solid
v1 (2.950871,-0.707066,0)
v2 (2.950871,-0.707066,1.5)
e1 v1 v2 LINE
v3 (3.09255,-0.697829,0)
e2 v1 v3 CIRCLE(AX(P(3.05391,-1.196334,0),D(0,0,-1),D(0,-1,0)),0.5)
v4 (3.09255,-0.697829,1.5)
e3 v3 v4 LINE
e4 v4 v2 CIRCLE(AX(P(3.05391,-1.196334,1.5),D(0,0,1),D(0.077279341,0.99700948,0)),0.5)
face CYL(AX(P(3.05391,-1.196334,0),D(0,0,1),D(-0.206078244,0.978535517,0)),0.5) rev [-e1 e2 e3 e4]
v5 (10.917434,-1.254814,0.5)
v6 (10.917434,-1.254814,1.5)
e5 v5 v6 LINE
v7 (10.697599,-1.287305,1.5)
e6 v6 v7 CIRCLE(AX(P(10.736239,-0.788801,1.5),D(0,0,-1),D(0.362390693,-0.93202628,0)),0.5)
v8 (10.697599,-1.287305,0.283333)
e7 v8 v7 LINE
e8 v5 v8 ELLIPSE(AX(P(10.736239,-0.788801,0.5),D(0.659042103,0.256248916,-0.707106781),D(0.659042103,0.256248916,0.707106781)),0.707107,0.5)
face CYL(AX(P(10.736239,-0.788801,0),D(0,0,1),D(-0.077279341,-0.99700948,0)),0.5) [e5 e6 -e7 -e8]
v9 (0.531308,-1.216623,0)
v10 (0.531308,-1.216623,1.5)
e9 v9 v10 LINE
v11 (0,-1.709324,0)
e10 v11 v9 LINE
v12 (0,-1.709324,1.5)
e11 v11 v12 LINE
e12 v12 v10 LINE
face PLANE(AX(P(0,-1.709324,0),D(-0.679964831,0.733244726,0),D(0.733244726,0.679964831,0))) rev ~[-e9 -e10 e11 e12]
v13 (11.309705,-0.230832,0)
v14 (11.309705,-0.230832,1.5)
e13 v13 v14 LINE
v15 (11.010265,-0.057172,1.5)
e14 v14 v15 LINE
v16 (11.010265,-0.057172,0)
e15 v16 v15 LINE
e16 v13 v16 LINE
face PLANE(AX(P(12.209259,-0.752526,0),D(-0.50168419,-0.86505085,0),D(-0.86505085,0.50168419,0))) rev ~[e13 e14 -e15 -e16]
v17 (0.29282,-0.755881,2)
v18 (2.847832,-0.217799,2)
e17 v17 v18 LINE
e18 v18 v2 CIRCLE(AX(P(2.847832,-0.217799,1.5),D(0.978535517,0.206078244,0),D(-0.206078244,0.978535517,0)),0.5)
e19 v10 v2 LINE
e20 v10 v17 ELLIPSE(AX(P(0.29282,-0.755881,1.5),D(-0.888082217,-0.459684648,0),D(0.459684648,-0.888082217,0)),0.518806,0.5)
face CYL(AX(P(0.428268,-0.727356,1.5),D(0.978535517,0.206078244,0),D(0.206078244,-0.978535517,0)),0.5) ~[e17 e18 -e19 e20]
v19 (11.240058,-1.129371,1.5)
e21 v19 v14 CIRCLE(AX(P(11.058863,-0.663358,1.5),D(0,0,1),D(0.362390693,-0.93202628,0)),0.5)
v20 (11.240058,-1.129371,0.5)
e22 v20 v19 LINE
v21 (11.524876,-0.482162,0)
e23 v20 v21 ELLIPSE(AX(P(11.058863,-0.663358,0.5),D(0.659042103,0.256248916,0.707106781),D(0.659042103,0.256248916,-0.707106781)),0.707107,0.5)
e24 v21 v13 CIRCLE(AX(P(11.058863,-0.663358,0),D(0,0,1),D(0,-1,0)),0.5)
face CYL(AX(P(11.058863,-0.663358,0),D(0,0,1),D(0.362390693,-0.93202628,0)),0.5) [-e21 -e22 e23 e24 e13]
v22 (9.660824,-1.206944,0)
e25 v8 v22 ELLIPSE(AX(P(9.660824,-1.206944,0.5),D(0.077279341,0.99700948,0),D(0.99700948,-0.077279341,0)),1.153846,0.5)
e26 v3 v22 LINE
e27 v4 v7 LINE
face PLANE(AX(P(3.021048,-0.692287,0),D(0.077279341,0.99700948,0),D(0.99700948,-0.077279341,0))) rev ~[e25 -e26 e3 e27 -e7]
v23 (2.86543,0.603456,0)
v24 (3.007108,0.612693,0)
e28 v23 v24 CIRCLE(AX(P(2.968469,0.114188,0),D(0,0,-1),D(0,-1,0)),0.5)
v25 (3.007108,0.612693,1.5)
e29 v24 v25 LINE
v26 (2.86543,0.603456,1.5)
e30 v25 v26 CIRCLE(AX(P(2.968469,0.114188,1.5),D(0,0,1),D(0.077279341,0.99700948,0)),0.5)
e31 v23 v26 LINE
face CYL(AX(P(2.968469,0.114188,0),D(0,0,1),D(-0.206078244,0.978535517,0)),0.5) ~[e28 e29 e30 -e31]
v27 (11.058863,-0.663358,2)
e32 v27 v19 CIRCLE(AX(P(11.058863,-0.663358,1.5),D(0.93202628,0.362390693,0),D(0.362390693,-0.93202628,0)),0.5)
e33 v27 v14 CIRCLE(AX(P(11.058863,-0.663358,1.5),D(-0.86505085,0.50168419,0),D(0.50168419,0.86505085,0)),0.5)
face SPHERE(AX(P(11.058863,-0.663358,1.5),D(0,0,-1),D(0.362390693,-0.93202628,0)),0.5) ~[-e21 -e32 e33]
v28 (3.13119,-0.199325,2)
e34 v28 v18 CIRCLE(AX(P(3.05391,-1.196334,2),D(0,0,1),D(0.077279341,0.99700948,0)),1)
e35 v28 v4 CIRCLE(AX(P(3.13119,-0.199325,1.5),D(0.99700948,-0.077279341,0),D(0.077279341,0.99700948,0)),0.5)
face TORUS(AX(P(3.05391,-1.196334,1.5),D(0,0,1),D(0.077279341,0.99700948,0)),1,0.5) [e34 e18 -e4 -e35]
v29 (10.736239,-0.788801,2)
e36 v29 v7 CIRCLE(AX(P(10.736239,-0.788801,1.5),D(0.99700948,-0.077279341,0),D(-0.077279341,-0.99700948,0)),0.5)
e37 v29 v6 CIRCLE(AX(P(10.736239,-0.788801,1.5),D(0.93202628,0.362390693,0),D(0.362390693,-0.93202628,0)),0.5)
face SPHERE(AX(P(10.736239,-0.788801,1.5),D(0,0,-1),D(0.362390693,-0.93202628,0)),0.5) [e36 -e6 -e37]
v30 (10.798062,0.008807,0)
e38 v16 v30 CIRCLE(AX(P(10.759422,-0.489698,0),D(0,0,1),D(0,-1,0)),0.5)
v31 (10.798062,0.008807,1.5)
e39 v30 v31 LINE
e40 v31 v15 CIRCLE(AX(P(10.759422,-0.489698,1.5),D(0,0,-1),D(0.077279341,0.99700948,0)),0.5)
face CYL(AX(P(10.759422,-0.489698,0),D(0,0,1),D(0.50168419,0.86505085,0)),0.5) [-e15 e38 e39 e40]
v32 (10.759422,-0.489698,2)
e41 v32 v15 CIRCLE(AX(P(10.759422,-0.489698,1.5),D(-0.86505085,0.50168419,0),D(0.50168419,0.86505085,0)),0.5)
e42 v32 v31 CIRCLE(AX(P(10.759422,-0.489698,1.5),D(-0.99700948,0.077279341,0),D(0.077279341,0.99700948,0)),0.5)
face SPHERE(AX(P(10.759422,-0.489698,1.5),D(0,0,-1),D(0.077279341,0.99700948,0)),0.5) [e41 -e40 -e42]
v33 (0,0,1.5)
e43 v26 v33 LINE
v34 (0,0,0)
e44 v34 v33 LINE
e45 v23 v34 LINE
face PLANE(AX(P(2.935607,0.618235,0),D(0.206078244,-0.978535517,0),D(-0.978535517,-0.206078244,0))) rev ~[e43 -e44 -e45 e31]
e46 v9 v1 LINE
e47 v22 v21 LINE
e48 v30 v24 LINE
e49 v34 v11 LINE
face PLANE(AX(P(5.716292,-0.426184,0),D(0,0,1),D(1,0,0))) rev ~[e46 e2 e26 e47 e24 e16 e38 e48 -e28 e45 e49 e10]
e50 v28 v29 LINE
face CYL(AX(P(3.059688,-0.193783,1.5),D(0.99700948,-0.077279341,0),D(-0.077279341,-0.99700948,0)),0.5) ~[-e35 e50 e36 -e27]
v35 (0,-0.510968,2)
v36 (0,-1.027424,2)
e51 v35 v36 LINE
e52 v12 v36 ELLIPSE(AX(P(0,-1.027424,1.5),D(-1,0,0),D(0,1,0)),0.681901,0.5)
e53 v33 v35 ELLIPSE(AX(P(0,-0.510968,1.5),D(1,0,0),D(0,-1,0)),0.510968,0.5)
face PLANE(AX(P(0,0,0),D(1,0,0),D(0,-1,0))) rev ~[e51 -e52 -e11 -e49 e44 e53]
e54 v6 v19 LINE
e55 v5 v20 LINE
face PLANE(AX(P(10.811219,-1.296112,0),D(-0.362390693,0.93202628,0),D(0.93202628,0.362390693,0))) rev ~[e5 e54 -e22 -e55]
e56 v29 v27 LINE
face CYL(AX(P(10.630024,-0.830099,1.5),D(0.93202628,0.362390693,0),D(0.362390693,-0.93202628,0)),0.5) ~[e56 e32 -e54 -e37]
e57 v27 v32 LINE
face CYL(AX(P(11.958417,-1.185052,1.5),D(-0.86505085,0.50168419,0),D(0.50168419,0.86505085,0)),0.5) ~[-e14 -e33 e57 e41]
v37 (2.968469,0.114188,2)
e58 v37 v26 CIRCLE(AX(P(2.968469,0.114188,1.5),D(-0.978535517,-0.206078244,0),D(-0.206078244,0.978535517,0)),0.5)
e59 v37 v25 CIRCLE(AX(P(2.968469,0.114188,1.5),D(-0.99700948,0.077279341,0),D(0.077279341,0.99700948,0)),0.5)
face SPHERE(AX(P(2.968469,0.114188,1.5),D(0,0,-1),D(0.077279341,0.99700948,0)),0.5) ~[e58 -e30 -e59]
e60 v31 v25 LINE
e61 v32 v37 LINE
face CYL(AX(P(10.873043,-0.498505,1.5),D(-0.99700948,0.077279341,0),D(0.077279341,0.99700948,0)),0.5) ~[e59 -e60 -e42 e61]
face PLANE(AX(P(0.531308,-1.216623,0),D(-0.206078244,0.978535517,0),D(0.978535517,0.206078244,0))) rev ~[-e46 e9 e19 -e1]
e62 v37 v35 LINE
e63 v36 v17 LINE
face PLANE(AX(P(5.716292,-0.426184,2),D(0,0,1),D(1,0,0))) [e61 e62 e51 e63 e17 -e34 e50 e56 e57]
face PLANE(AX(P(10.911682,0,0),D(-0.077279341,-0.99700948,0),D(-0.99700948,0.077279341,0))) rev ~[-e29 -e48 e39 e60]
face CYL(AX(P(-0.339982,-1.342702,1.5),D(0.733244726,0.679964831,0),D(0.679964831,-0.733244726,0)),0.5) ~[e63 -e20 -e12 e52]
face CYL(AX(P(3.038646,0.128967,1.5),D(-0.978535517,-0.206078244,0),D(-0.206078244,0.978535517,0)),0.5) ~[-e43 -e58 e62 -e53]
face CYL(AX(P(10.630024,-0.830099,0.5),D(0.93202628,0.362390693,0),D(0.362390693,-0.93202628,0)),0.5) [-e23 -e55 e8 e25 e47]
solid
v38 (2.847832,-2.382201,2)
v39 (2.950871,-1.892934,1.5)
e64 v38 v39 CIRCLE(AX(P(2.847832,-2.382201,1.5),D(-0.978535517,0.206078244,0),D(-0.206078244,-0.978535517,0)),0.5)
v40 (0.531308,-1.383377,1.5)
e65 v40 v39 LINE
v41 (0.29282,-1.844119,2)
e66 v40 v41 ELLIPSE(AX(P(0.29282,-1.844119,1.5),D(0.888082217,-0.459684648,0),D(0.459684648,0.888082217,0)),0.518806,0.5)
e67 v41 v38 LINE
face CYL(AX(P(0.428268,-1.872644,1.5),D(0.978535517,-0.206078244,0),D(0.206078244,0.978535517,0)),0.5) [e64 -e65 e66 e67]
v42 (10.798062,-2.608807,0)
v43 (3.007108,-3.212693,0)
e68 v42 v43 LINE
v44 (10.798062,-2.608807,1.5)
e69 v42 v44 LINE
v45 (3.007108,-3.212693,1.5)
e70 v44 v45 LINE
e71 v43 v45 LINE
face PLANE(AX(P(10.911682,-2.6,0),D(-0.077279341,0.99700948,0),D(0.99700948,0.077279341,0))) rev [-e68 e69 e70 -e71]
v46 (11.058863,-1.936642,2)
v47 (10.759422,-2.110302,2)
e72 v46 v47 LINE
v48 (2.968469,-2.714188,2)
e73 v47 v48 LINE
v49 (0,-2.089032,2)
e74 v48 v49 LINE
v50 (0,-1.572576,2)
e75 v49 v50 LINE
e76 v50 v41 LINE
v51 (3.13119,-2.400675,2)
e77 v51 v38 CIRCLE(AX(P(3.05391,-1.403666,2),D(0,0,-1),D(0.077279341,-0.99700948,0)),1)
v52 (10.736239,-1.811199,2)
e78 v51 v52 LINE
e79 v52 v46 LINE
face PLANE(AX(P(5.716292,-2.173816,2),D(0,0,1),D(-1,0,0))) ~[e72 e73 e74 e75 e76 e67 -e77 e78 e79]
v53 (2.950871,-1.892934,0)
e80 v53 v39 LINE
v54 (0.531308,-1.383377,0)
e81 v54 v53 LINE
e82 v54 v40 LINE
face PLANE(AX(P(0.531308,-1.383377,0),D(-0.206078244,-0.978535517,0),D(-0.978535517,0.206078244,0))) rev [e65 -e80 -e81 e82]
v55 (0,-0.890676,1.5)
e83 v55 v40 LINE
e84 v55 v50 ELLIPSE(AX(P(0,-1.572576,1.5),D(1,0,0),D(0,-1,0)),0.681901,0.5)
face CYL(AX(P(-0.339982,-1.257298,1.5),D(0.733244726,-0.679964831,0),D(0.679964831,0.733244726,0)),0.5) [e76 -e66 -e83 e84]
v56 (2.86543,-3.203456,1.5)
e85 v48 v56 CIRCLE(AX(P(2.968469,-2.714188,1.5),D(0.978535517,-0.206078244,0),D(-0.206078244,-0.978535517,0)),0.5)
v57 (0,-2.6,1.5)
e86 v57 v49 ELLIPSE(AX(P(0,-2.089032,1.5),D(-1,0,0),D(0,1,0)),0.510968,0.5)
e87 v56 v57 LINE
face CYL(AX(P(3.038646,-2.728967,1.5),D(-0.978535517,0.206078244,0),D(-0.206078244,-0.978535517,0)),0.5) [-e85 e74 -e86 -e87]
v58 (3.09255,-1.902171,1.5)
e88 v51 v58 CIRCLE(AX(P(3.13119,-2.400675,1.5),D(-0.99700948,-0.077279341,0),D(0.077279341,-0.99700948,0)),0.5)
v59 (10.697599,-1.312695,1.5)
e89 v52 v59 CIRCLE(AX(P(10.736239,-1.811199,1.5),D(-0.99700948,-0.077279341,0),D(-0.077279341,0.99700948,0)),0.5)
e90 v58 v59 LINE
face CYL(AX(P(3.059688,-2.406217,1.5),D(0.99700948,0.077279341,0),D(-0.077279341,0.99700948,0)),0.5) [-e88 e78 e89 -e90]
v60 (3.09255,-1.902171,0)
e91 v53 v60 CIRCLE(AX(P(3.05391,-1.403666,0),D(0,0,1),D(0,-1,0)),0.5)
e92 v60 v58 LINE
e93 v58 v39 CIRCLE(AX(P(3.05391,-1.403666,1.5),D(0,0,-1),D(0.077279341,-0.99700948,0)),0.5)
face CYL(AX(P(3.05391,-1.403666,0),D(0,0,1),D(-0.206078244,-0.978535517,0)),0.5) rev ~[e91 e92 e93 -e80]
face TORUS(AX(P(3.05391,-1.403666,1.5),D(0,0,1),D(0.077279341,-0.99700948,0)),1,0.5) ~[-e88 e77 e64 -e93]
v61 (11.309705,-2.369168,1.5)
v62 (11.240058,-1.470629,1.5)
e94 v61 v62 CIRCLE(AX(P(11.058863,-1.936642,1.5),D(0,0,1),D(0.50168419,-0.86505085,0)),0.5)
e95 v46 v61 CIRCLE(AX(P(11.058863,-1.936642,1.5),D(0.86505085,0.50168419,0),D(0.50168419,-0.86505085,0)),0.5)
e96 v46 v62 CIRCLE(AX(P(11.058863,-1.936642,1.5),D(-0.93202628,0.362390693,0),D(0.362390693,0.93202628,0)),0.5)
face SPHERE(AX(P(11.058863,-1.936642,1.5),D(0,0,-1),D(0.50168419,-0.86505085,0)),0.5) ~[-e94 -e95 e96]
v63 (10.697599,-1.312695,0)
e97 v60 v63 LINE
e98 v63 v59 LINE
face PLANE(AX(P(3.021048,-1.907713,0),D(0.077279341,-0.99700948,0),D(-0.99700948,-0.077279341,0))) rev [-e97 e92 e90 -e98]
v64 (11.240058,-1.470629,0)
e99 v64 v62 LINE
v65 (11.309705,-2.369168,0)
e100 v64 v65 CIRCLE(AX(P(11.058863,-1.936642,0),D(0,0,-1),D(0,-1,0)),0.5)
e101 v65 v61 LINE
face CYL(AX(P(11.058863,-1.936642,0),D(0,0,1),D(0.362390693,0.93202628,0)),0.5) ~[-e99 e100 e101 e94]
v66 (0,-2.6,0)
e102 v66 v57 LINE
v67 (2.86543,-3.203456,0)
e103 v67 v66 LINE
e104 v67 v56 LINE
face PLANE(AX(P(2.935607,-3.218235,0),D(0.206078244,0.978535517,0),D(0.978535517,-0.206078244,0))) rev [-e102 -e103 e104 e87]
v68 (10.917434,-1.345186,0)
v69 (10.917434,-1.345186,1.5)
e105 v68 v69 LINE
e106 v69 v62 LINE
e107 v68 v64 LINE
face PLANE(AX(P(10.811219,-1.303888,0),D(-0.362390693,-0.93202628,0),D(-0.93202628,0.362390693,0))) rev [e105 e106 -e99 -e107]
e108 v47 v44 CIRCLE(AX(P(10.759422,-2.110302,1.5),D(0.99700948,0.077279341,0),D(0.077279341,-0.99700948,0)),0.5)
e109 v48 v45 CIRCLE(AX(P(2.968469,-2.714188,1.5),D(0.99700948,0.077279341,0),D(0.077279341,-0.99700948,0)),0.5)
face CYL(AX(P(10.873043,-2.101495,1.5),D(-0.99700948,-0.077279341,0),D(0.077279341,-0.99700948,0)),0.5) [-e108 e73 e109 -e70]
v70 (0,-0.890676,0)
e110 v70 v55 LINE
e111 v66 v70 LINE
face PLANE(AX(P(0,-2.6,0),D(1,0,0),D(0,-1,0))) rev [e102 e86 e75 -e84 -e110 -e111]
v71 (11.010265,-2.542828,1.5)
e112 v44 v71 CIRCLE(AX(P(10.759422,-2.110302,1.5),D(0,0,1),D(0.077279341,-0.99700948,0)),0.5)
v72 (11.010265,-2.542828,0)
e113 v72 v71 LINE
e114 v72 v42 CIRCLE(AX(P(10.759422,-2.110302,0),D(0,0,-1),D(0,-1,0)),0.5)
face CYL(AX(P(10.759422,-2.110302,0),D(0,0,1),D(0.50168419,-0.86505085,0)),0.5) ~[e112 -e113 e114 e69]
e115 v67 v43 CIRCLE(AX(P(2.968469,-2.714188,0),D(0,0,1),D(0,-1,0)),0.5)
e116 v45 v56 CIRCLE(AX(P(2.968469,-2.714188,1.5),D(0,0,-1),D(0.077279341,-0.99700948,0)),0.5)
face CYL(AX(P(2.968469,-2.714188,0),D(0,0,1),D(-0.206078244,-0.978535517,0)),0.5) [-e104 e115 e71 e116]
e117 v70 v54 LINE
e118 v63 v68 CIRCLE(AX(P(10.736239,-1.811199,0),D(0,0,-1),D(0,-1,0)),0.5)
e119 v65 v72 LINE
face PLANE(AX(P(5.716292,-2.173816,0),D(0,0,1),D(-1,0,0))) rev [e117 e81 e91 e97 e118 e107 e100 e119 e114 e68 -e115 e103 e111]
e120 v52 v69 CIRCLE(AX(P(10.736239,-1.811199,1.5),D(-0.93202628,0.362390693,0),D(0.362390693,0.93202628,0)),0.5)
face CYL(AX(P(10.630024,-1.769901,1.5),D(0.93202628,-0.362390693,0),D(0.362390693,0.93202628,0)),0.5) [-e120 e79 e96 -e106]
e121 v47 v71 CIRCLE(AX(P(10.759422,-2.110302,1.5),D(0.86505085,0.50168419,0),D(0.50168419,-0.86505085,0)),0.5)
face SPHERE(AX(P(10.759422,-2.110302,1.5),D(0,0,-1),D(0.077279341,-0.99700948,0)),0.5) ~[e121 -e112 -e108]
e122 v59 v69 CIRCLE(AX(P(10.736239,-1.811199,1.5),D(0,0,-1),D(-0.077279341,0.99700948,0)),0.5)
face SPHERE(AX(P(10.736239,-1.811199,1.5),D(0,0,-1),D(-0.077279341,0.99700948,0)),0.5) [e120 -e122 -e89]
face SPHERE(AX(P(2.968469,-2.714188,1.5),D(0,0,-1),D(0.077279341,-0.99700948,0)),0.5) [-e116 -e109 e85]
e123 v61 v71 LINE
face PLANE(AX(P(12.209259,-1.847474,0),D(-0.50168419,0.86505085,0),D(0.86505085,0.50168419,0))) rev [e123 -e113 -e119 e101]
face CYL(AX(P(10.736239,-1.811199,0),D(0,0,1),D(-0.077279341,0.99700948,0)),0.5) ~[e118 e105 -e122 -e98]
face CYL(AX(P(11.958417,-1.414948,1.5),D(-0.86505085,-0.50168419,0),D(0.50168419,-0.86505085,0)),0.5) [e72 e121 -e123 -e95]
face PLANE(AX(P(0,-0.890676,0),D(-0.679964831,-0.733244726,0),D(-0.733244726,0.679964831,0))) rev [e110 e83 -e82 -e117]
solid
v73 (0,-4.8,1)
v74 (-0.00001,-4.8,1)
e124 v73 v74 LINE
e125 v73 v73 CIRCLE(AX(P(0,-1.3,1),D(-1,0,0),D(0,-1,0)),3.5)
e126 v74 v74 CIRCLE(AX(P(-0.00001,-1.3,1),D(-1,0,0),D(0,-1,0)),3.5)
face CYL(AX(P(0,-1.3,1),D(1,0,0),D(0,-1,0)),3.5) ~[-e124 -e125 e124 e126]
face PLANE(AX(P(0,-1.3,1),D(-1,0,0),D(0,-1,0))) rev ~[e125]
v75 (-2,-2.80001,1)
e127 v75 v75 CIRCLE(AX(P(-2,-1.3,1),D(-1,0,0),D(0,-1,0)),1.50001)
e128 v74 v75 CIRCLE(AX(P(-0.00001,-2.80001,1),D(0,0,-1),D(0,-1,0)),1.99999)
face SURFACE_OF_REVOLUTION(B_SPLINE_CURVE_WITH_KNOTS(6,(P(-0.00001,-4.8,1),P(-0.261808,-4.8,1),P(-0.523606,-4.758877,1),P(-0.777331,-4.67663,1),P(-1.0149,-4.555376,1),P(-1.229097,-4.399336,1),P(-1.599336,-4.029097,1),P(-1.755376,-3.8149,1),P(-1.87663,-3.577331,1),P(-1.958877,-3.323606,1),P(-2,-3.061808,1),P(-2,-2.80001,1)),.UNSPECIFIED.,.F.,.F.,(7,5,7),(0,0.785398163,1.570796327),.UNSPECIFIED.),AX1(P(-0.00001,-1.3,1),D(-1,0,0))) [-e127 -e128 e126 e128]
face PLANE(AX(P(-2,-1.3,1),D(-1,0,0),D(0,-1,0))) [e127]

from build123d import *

# Parameters (mm, degrees)
F1_DEPTH = 2
F4_R     = 0.5
F4_2_R   = 0.5
F5_R     = 3.5
F6_DEPTH = 2
F7_R     = 1.99999


# Not quite as in the source:
# - a fillet or chamfer is up to 0.001 mm smaller than in the source, because OpenCascade refuses the exact size


with BuildPart() as f1:
    # F0 (on Top) → F1 (new body)
    with BuildSketch(Plane.XY):
        Polygon((2.93560655, 0.6182347319), (0, 0), (0, -1.7093243077), (0.5313075392, -1.2166232651), (3.0210481864, -0.6922872837), (10.8112192467, -1.2961123241), (12.209258666, -0.7525262849), (10.9116823906, 0), align=None)
    extrude(amount=F1_DEPTH)


with BuildPart() as f3_1:
    # F3: instance of F1
    add(f1.part.mirror(Plane.XZ.offset(1.3)))

    # F4#2
    f4_2_edges = [f3_1.edges().sort_by_distance(p)[0] for p in [
        (3.021048, -1.907713, 1),
        (10.811219, -1.303888, 1),
        (12.209259, -1.847474, 1),
        (10.911682, -2.6, 1),
        (6.923644, -2.909117, 2),
        (11.560471, -2.223737, 2),
        (6.916134, -1.6058, 2),
        (11.510239, -1.575681, 2),
        (1.467803, -2.909117, 2),
        (2.935607, -3.218235, 1),
        (1.776178, -1.645545, 2),
        (0.265654, -1.137026, 2),
    ]]
    fillet(f4_2_edges, radius=F4_2_R)


with BuildPart() as f1_1:
    add(f1.part)

    # F4
    f4_edges = [f1_1.edges().sort_by_distance(p)[0] for p in [
        (6.916134, -0.9942, 2),
        (6.923644, 0.309117, 2),
        (11.560471, -0.376263, 2),
        (10.811219, -1.296112, 1),
        (12.209259, -0.752526, 1),
        (11.510239, -1.024319, 0),
        (11.510239, -1.024319, 2),
        (1.467803, 0.309117, 2),
        (1.776178, -0.954455, 2),
        (3.021048, -0.692287, 1),
        (0.265654, -1.462974, 2),
        (10.911682, 0, 1),
        (2.935607, 0.618235, 1),
    ]]
    fillet(f4_edges, radius=F4_R)


with BuildPart() as f6:
    # F5 (on face) → F6 (new body)
    with BuildSketch(Plane(origin=(0, 0, 0), x_dir=(0, -1, 0), z_dir=(-1, 0, 0))):
        with Locations((1.3, 1)):
            Circle(F5_R)
        with BuildLine():
            Line((0, 0), (0, 1.5))
            add(Edge.make_bspline(
                [(0, 1.5), (0, 2), (0.5109676568, 2)],
                knots=[3.1415926536, 3.1415926536, 3.1415926536, 4.7123889804, 4.7123889804, 4.7123889804], degree=2, weights=[1, 0.7071067812, 1]))
            Line((0.5109676568, 2), (1.0274237333, 2))
            add(Edge.make_bspline(
                [(1.7093243077, 1.5), (1.7093243077, 2), (1.0274237333, 2)],
                knots=[3.1415926536, 3.1415926536, 3.1415926536, 4.7123889804, 4.7123889804, 4.7123889804], degree=2, weights=[1, 0.7071067812, 1]))
            Line((1.7093243077, 1.5), (1.7093243077, 0))
            Line((1.7093243077, 0), (0, 0))
        make_face(mode=Mode.SUBTRACT)
        with BuildLine():
            add(Edge.make_bspline(
                [(0, 1.5), (0, 2), (0.5109676568, 2)],
                knots=[3.1415926536, 3.1415926536, 3.1415926536, 4.7123889804, 4.7123889804, 4.7123889804], degree=2, weights=[1, 0.7071067812, 1]))
            Line((0, 1.5), (0, 0))
            Line((0, 0), (1.7093243077, 0))
            Line((1.7093243077, 0), (1.7093243077, 1.5))
            add(Edge.make_bspline(
                [(1.7093243077, 1.5), (1.7093243077, 2), (1.0274237333, 2)],
                knots=[3.1415926536, 3.1415926536, 3.1415926536, 4.7123889804, 4.7123889804, 4.7123889804], degree=2, weights=[1, 0.7071067812, 1]))
            Line((1.0274237333, 2), (0.5109676568, 2))
        make_face()
    extrude(amount=F6_DEPTH)

    # F7 (radius 2 in the source; OpenCascade refuses exactly that, so slightly less here)
    f7_edges = [f6.edges().sort_by_distance(p)[0] for p in [
        (-2, 2.2, 1),
    ]]
    fillet(f7_edges, radius=F7_R)


solid = Compound([f3_1.part, f1_1.part, f6.part])
